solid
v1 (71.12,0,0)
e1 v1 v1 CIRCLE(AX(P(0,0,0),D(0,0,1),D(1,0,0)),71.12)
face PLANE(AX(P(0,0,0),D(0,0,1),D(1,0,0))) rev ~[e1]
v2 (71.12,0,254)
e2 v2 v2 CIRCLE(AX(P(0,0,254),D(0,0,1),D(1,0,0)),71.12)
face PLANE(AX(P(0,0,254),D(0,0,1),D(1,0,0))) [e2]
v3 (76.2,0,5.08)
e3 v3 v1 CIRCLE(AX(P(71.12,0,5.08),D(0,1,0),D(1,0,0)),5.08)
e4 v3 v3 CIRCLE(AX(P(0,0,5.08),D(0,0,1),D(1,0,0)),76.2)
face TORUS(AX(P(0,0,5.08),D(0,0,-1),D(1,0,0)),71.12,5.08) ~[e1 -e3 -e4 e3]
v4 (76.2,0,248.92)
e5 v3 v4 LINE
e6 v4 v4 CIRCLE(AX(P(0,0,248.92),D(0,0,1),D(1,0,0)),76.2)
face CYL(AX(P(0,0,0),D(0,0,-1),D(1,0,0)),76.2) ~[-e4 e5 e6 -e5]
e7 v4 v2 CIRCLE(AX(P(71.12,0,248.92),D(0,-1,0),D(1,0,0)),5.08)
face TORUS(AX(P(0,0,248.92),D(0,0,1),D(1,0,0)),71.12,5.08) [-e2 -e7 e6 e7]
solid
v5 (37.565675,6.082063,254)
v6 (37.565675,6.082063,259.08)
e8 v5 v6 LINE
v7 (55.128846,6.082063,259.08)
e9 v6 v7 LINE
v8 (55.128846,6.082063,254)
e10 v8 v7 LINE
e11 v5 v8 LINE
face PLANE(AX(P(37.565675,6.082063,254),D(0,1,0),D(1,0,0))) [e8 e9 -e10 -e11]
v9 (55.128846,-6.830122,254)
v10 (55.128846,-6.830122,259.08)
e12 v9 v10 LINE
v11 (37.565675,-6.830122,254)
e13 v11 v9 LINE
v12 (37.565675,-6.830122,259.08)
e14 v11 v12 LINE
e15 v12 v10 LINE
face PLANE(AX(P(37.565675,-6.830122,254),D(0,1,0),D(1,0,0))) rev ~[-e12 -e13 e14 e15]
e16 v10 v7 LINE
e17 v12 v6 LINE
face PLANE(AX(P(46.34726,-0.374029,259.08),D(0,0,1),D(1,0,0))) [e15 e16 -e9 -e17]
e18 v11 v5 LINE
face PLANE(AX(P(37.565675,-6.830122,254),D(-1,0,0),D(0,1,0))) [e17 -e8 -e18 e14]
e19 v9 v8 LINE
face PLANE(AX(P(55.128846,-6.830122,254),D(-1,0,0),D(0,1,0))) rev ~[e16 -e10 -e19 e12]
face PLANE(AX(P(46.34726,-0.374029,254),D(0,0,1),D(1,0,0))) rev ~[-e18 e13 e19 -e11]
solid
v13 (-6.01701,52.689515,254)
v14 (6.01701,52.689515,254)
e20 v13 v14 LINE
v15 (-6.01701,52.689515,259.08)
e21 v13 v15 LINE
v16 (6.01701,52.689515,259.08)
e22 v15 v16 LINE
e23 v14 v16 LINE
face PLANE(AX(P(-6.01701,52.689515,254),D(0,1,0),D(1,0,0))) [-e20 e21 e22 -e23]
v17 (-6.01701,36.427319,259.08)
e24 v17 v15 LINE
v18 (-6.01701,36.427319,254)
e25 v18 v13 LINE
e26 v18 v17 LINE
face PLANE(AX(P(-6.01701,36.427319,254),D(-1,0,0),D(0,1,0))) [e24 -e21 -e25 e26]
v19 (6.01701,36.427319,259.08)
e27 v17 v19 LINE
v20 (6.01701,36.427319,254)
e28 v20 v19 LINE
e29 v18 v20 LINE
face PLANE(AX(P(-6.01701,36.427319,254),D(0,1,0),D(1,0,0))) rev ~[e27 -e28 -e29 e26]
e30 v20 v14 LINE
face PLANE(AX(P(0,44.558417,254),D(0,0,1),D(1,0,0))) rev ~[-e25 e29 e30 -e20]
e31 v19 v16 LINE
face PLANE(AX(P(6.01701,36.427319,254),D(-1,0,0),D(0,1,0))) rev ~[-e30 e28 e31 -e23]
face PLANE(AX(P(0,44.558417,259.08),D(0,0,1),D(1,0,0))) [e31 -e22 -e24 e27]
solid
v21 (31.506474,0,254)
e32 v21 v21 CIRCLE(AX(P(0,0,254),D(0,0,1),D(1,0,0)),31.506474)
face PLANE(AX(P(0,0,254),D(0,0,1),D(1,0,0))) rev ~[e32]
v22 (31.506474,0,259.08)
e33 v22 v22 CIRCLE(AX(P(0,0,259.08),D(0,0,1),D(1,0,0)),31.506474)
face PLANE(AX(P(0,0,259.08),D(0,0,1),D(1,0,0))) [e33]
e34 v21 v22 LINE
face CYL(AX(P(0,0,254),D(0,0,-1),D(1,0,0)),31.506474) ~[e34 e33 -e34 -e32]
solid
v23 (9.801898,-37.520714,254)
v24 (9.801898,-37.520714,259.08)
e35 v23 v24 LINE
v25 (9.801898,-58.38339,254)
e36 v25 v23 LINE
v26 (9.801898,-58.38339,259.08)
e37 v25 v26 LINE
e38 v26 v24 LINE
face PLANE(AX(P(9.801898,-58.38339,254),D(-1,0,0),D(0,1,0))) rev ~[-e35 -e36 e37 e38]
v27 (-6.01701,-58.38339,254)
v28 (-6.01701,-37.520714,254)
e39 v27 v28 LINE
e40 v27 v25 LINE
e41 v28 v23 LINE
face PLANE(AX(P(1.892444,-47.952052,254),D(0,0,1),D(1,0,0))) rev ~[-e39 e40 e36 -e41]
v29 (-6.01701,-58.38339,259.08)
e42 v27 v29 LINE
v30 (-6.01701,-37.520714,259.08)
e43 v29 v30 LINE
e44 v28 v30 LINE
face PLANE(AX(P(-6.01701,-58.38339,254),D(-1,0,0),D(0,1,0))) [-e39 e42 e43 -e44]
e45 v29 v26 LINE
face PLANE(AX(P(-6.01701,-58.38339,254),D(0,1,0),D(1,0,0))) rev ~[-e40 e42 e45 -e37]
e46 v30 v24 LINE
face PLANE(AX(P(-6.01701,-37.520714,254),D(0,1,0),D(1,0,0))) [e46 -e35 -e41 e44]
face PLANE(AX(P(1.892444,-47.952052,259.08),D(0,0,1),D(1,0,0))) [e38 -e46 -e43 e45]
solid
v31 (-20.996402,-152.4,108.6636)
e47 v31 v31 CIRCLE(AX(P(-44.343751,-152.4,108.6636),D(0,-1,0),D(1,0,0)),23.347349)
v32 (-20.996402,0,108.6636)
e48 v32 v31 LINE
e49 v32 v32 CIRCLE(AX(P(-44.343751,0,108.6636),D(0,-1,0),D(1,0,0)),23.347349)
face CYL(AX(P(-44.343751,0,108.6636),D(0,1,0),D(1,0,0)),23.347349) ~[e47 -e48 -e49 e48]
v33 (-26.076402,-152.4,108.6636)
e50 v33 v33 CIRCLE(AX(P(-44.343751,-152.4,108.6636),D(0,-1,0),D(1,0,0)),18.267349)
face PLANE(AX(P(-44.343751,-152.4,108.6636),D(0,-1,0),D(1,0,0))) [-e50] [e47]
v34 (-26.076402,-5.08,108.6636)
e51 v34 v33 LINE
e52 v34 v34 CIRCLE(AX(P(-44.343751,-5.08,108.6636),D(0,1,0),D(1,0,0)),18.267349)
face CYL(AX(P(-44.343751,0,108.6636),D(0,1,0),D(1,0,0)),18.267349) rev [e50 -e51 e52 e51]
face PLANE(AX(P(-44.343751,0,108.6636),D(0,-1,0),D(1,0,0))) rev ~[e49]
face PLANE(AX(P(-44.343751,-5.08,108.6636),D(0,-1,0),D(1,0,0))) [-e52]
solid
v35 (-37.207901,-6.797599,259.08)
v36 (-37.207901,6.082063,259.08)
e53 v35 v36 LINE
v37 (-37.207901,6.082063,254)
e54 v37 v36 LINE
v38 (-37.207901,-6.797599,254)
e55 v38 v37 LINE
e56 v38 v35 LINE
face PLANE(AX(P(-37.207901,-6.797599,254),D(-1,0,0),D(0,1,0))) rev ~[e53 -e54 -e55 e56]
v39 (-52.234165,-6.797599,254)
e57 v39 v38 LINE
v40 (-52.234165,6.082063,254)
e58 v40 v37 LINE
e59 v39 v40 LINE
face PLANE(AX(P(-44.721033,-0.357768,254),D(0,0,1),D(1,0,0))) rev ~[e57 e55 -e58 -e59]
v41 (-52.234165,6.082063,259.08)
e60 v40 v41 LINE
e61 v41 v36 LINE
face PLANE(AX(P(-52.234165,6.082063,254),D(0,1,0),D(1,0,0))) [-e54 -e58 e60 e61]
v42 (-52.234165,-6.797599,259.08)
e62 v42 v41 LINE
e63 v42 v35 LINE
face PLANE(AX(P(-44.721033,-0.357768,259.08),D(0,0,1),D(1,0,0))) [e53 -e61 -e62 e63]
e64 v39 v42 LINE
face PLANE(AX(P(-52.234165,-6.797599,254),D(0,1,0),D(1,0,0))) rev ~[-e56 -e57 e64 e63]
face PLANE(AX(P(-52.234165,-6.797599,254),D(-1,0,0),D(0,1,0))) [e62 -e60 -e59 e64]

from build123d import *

# Parameters (mm, degrees)
F0_R      = 76.2
F1_DEPTH  = 254
F2_R      = 31.5064742485
F3_DEPTH  = 5.08
F5_R      = 5.08
F6_R      = 5.08
F7_W      = 15.0262638927
F7_H      = 12.87966175
F8_DEPTH  = 5.08
F9_W      = 12.0340203866
F9_H      = 16.2621960044
F10_DEPTH = 5.08
F11_W     = 17.5631716847
F11_H     = 12.9121849313
F12_DEPTH = 5.08
F13_W     = 15.818908345
F13_H     = 20.8626762033
F14_DEPTH = 5.08
F15_R     = 23.3473489608
F16_DEPTH = 152.4
F18_T     = -5.08


# Not quite as in the source:
# - a feature of the source that left no trace in its solid (it failed there, or was rolled back) is left out


with BuildPart() as f1:
    # F0 (on Top) → F1 (new body)
    with BuildSketch(Plane.XY):
        Circle(F0_R)
    extrude(amount=F1_DEPTH)

    # F5
    f5_edges = [f1.edges().sort_by_distance(p)[0] for p in [
        (-76.2, 0, 254),
    ]]
    fillet(f5_edges, radius=F5_R)

    # F6
    f6_edges = [f1.edges().sort_by_distance(p)[0] for p in [
        (-76.2, 0, 0),
    ]]
    fillet(f6_edges, radius=F6_R)


with BuildPart() as f3:
    # F2 (on face) → F3 (new body)
    with BuildSketch(Plane.XY.offset(254)):
        Circle(F2_R)
    extrude(amount=F3_DEPTH)


with BuildPart() as f8:
    # F7 (on face) → F8 (new body)
    with BuildSketch(Plane.XY.offset(254)):
        with Locations((-44.7210334241, -0.3577677999)):
            Rectangle(F7_W, F7_H)
    extrude(amount=F8_DEPTH)


with BuildPart() as f10:
    # F9 (on face) → F10 (new body)
    with BuildSketch(Plane.XY.offset(254)):
        with Locations((0, 44.558417052)):
            Rectangle(F9_W, F9_H)
    extrude(amount=F10_DEPTH)


with BuildPart() as f12:
    # F11 (on face) → F12 (new body)
    with BuildSketch(Plane.XY.offset(254)):
        with Locations((46.3472604752, -0.3740293905)):
            Rectangle(F11_W, F11_H)
    extrude(amount=F12_DEPTH)


with BuildPart() as f14:
    # F13 (on face) → F14 (new body)
    with BuildSketch(Plane.XY.offset(254)):
        with Locations((1.8924439792, -47.9520522058)):
            Rectangle(F13_W, F13_H)
    extrude(amount=F14_DEPTH)


with BuildPart() as f16:
    # F15 (on Front) → F16 (new body)
    with BuildSketch(Plane.XZ):
        with Locations((-44.3437509239, -31.4783900976)):
            Circle(F15_R)
    extrude(amount=F16_DEPTH)


with BuildPart() as f16_1:
    # F17: moved
    add(f16.part.moved(Location((0, 0, 140.14199))))

    # F18
    f18_openings = [f16_1.faces().sort_by_distance(p)[0] for p in [
        (-44.343751, -152.4, 108.6636),
    ]]
    offset(amount=F18_T, openings=f18_openings)


solid = Compound([f1.part, f3.part, f8.part, f10.part, f12.part, f14.part, f16_1.part])
